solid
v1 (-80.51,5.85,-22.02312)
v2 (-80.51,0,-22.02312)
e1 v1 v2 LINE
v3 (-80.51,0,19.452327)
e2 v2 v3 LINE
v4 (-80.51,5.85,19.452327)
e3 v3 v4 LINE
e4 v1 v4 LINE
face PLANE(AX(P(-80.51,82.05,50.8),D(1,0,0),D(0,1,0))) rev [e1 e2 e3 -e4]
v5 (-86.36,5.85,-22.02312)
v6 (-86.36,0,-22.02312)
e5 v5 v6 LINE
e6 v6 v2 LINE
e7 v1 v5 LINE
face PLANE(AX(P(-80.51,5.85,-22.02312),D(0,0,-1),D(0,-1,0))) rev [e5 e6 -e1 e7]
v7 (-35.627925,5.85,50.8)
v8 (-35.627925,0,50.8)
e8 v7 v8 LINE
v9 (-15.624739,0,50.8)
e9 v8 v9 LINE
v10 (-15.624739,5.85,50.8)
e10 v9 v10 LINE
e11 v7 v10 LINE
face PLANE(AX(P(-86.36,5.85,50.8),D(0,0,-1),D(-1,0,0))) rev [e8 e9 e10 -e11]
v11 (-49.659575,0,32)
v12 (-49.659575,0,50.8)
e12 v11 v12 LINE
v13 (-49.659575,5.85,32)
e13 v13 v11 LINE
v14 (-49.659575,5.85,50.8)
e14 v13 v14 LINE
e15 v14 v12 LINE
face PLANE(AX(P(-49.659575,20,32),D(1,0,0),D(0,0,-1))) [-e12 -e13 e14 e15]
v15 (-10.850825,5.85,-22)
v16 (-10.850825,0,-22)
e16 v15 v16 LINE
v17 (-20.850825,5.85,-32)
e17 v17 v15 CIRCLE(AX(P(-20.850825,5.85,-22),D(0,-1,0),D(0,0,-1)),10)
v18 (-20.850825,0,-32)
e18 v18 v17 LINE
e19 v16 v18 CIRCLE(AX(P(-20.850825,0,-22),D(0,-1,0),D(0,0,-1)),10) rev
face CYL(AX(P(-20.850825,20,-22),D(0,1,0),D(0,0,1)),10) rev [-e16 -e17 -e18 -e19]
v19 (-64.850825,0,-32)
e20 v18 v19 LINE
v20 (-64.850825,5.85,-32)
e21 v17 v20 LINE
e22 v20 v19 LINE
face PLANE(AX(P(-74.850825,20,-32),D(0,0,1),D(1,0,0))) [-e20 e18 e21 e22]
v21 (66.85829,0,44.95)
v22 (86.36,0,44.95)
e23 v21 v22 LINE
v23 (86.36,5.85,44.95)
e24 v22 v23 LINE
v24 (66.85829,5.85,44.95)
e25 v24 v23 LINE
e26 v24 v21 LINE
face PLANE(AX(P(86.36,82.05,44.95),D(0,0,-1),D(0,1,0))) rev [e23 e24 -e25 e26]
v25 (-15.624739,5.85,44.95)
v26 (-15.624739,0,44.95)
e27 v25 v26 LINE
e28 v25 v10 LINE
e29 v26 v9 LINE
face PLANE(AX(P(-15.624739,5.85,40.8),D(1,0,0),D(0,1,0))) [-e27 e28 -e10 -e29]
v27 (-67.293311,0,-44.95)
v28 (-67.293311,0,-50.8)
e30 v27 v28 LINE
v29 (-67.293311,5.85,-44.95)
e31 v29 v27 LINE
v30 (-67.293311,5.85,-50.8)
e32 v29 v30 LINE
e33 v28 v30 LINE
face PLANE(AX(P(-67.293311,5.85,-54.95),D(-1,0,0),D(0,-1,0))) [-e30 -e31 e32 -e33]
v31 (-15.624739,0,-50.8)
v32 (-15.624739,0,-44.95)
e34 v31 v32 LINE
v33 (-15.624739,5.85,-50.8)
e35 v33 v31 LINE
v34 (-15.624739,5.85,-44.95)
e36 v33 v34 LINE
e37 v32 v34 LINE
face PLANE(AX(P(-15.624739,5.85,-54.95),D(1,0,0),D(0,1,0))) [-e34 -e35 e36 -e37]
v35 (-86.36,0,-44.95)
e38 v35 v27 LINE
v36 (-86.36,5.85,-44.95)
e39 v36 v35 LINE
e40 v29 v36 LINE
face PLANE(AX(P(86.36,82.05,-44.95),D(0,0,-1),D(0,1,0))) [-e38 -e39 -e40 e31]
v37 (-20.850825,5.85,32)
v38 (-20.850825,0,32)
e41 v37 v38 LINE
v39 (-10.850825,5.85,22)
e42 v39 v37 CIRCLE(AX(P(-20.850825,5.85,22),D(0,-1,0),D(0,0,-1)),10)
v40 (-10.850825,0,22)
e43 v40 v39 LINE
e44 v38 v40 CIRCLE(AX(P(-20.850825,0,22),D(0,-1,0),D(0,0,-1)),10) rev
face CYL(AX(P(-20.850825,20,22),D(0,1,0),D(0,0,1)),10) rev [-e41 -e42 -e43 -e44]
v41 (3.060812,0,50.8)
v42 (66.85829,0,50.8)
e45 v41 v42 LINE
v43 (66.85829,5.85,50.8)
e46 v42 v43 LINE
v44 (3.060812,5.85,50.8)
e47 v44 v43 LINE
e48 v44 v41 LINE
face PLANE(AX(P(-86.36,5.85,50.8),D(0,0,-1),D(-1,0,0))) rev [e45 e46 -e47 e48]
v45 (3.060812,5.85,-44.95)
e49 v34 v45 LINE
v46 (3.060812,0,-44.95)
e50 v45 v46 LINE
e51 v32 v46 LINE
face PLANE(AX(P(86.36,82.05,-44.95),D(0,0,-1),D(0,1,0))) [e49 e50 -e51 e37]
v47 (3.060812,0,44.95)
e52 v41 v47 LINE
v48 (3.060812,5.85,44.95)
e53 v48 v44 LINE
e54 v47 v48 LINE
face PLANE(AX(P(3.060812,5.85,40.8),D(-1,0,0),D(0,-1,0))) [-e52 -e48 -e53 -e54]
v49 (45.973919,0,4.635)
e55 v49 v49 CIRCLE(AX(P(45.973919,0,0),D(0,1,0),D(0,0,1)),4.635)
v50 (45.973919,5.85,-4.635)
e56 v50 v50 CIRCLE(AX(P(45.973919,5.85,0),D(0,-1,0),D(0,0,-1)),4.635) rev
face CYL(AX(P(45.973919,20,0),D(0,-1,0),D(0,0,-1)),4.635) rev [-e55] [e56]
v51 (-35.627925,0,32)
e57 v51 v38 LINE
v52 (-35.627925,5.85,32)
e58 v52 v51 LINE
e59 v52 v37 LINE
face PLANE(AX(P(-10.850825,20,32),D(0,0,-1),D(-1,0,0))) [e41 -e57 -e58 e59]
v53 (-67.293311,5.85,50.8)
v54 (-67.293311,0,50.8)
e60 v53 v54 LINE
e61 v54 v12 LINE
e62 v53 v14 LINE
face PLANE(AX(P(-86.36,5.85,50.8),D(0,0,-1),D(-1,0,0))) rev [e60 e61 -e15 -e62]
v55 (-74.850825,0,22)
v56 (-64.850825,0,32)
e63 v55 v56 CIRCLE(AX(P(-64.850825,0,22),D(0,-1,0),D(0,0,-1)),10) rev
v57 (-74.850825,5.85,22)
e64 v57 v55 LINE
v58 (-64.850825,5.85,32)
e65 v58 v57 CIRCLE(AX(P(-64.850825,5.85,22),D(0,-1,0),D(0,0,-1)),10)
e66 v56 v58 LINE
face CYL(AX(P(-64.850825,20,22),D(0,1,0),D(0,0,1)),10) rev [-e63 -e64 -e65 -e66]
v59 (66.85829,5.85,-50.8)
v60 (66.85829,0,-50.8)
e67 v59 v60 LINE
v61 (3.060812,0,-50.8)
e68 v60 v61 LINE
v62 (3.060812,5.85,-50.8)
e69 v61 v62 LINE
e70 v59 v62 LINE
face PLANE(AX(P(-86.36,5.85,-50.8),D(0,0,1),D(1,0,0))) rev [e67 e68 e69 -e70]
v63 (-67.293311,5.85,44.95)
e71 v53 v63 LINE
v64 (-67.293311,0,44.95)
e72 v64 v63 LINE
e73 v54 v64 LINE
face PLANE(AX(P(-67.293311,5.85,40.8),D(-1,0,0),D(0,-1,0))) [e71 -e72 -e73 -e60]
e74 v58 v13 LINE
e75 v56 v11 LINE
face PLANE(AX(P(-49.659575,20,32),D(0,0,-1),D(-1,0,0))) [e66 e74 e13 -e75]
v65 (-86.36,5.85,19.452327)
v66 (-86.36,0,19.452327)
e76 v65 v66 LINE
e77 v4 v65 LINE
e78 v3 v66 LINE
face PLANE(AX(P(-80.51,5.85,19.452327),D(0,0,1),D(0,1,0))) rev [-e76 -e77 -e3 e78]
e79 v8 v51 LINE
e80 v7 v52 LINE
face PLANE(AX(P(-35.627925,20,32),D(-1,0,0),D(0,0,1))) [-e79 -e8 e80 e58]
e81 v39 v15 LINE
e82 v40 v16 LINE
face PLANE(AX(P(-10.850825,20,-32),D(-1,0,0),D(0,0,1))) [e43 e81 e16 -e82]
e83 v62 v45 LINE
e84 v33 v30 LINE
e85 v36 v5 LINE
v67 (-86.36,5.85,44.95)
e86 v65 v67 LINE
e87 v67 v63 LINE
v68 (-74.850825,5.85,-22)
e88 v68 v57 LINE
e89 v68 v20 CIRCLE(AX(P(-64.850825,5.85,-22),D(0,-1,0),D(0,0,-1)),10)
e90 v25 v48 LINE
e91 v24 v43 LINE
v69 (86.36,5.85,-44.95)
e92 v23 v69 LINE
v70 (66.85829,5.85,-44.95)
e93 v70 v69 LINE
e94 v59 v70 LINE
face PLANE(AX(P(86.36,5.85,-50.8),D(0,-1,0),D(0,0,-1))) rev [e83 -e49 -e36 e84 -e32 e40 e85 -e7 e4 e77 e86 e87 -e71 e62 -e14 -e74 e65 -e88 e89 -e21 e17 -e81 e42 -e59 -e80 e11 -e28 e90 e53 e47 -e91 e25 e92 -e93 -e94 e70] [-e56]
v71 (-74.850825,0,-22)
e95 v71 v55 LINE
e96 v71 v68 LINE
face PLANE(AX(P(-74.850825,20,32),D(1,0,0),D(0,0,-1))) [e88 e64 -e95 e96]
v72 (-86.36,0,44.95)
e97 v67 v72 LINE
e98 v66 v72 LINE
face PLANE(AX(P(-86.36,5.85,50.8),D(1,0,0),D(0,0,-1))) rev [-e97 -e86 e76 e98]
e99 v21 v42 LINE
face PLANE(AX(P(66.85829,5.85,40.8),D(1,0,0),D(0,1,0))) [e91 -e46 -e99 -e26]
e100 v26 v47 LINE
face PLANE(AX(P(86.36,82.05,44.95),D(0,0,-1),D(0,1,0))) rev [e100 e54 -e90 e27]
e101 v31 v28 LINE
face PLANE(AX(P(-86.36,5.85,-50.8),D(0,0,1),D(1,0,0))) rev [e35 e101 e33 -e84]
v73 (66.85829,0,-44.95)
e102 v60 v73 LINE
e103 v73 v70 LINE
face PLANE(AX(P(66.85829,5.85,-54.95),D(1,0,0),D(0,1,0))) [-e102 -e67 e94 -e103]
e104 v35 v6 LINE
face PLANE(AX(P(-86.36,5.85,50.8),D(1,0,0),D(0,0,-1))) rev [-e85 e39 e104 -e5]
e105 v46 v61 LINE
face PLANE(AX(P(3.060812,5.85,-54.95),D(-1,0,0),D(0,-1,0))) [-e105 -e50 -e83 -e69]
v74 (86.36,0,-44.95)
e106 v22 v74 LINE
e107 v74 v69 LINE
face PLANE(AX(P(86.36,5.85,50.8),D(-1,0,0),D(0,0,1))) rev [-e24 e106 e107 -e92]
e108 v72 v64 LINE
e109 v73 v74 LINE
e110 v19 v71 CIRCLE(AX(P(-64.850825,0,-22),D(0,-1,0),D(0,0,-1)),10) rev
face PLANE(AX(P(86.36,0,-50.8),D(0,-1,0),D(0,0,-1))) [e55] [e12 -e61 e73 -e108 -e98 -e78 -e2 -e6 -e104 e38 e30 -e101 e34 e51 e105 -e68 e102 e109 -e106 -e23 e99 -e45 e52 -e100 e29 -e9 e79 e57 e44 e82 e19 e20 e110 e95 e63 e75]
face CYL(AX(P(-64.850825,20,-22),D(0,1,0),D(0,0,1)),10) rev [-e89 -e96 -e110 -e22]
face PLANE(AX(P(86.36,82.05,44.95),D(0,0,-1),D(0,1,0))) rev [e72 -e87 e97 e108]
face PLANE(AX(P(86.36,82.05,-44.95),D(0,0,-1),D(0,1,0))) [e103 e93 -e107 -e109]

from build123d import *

# Parameters (mm, degrees)
SKETCH1_W             = 172.72
SKETCH1_H             = 101.6
BOSS_EXTRUDE1_DEPTH   = 5.85
SKETCH5_R             = 4.635
CUT_EXTRUDE10_DEPTH   = 20
FILLET6_R             = 10
CAVITY1_START         = -50.8
CAVITY1_OUTLINE_W     = 19.066688648
CAVITY1_OUTLINE_H     = 5.85
CAVITY1_OUTLINE_W_2   = 18.685550926
CAVITY1_OUTLINE_W_3   = 19.50170991
CAVITY1_DEPTH         = 5.85
CAVITY1_START_2       = 44.95
CAVITY1_2_OUTLINE_W   = 19.066688648
CAVITY1_2_OUTLINE_H   = 5.85
CAVITY1_2_OUTLINE_W_2 = 18.685550926
CAVITY1_2_OUTLINE_W_3 = 19.50170991
CAVITY1_2_DEPTH       = 5.85
CAVITY1_START_3       = -22.02311963
CAVITY1_3_OUTLINE_W   = 5.85
CAVITY1_3_OUTLINE_H   = 5.85
CAVITY1_3_DEPTH       = 41.475447085


# Read off the part's stored shape, not the designer's step: Cavity1
with BuildPart() as part:
    # Sketch1 → Boss-Extrude1 (new body)
    with BuildSketch(Plane(origin=(0, 0, 0), x_dir=(1, 0, 0), z_dir=(0, 1, 0))):
        Rectangle(SKETCH1_W, SKETCH1_H)
    extrude(amount=BOSS_EXTRUDE1_DEPTH)

    # Sketch5 → Cut-Extrude10 (cut)
    with BuildSketch(Plane(origin=(0, 0, 0), x_dir=(1, 0, 0), z_dir=(0, 1, 0))):
        with Locations(Location((45.9739194, 0, 0), (0, 0, 90))):
            Circle(SKETCH5_R)
        Polygon((-10.850825335, 32), (-10.850825335, 0), (-10.850825335, -32), (-35.627924906, -32), (-35.627924906, -50.8), (-49.659575094, -50.8), (-49.659575094, -32), (-74.850825335, -32), (-74.850825335, 32), (-42.850825335, 32), align=None)
    extrude(amount=CUT_EXTRUDE10_DEPTH, mode=Mode.SUBTRACT)

    # Fillet6
    fillet6_edges = [part.edges().sort_by_distance(p)[0] for p in [
        (-10.850825335, 2.925, -32),
        (-74.850825335, 2.925, -32),
        (-74.850825335, 2.925, 32),
        (-10.850825335, 2.925, 32),
    ]]
    fillet(fillet6_edges, radius=FILLET6_R)

    # Cavity1 outline → Cavity1 (cut)
    with BuildSketch(Plane.XY.offset(CAVITY1_START)):
        with Locations((-76.826655676, 2.925)):
            Rectangle(CAVITY1_OUTLINE_W, CAVITY1_OUTLINE_H)
        with Locations((-6.281963463, 2.925)):
            Rectangle(CAVITY1_OUTLINE_W_2, CAVITY1_OUTLINE_H)
        with Locations((76.609145045, 2.925)):
            Rectangle(CAVITY1_OUTLINE_W_3, CAVITY1_OUTLINE_H)
    extrude(amount=CAVITY1_DEPTH, mode=Mode.SUBTRACT)

    # Cavity1 2 outline → Cavity1 2 (cut)
    with BuildSketch(Plane.XY.offset(CAVITY1_START_2)):
        with Locations((-76.826655676, 2.925)):
            Rectangle(CAVITY1_2_OUTLINE_W, CAVITY1_2_OUTLINE_H)
        with Locations((-6.281963463, 2.925)):
            Rectangle(CAVITY1_2_OUTLINE_W_2, CAVITY1_2_OUTLINE_H)
        with Locations((76.609145045, 2.925)):
            Rectangle(CAVITY1_2_OUTLINE_W_3, CAVITY1_2_OUTLINE_H)
    extrude(amount=CAVITY1_2_DEPTH, mode=Mode.SUBTRACT)

    # Cavity1 3 outline → Cavity1 3 (cut)
    with BuildSketch(Plane.XY.offset(CAVITY1_START_3)):
        with Locations((-83.435, 2.925)):
            Rectangle(CAVITY1_3_OUTLINE_W, CAVITY1_3_OUTLINE_H)
    extrude(amount=CAVITY1_3_DEPTH, mode=Mode.SUBTRACT)


solid = part.part
